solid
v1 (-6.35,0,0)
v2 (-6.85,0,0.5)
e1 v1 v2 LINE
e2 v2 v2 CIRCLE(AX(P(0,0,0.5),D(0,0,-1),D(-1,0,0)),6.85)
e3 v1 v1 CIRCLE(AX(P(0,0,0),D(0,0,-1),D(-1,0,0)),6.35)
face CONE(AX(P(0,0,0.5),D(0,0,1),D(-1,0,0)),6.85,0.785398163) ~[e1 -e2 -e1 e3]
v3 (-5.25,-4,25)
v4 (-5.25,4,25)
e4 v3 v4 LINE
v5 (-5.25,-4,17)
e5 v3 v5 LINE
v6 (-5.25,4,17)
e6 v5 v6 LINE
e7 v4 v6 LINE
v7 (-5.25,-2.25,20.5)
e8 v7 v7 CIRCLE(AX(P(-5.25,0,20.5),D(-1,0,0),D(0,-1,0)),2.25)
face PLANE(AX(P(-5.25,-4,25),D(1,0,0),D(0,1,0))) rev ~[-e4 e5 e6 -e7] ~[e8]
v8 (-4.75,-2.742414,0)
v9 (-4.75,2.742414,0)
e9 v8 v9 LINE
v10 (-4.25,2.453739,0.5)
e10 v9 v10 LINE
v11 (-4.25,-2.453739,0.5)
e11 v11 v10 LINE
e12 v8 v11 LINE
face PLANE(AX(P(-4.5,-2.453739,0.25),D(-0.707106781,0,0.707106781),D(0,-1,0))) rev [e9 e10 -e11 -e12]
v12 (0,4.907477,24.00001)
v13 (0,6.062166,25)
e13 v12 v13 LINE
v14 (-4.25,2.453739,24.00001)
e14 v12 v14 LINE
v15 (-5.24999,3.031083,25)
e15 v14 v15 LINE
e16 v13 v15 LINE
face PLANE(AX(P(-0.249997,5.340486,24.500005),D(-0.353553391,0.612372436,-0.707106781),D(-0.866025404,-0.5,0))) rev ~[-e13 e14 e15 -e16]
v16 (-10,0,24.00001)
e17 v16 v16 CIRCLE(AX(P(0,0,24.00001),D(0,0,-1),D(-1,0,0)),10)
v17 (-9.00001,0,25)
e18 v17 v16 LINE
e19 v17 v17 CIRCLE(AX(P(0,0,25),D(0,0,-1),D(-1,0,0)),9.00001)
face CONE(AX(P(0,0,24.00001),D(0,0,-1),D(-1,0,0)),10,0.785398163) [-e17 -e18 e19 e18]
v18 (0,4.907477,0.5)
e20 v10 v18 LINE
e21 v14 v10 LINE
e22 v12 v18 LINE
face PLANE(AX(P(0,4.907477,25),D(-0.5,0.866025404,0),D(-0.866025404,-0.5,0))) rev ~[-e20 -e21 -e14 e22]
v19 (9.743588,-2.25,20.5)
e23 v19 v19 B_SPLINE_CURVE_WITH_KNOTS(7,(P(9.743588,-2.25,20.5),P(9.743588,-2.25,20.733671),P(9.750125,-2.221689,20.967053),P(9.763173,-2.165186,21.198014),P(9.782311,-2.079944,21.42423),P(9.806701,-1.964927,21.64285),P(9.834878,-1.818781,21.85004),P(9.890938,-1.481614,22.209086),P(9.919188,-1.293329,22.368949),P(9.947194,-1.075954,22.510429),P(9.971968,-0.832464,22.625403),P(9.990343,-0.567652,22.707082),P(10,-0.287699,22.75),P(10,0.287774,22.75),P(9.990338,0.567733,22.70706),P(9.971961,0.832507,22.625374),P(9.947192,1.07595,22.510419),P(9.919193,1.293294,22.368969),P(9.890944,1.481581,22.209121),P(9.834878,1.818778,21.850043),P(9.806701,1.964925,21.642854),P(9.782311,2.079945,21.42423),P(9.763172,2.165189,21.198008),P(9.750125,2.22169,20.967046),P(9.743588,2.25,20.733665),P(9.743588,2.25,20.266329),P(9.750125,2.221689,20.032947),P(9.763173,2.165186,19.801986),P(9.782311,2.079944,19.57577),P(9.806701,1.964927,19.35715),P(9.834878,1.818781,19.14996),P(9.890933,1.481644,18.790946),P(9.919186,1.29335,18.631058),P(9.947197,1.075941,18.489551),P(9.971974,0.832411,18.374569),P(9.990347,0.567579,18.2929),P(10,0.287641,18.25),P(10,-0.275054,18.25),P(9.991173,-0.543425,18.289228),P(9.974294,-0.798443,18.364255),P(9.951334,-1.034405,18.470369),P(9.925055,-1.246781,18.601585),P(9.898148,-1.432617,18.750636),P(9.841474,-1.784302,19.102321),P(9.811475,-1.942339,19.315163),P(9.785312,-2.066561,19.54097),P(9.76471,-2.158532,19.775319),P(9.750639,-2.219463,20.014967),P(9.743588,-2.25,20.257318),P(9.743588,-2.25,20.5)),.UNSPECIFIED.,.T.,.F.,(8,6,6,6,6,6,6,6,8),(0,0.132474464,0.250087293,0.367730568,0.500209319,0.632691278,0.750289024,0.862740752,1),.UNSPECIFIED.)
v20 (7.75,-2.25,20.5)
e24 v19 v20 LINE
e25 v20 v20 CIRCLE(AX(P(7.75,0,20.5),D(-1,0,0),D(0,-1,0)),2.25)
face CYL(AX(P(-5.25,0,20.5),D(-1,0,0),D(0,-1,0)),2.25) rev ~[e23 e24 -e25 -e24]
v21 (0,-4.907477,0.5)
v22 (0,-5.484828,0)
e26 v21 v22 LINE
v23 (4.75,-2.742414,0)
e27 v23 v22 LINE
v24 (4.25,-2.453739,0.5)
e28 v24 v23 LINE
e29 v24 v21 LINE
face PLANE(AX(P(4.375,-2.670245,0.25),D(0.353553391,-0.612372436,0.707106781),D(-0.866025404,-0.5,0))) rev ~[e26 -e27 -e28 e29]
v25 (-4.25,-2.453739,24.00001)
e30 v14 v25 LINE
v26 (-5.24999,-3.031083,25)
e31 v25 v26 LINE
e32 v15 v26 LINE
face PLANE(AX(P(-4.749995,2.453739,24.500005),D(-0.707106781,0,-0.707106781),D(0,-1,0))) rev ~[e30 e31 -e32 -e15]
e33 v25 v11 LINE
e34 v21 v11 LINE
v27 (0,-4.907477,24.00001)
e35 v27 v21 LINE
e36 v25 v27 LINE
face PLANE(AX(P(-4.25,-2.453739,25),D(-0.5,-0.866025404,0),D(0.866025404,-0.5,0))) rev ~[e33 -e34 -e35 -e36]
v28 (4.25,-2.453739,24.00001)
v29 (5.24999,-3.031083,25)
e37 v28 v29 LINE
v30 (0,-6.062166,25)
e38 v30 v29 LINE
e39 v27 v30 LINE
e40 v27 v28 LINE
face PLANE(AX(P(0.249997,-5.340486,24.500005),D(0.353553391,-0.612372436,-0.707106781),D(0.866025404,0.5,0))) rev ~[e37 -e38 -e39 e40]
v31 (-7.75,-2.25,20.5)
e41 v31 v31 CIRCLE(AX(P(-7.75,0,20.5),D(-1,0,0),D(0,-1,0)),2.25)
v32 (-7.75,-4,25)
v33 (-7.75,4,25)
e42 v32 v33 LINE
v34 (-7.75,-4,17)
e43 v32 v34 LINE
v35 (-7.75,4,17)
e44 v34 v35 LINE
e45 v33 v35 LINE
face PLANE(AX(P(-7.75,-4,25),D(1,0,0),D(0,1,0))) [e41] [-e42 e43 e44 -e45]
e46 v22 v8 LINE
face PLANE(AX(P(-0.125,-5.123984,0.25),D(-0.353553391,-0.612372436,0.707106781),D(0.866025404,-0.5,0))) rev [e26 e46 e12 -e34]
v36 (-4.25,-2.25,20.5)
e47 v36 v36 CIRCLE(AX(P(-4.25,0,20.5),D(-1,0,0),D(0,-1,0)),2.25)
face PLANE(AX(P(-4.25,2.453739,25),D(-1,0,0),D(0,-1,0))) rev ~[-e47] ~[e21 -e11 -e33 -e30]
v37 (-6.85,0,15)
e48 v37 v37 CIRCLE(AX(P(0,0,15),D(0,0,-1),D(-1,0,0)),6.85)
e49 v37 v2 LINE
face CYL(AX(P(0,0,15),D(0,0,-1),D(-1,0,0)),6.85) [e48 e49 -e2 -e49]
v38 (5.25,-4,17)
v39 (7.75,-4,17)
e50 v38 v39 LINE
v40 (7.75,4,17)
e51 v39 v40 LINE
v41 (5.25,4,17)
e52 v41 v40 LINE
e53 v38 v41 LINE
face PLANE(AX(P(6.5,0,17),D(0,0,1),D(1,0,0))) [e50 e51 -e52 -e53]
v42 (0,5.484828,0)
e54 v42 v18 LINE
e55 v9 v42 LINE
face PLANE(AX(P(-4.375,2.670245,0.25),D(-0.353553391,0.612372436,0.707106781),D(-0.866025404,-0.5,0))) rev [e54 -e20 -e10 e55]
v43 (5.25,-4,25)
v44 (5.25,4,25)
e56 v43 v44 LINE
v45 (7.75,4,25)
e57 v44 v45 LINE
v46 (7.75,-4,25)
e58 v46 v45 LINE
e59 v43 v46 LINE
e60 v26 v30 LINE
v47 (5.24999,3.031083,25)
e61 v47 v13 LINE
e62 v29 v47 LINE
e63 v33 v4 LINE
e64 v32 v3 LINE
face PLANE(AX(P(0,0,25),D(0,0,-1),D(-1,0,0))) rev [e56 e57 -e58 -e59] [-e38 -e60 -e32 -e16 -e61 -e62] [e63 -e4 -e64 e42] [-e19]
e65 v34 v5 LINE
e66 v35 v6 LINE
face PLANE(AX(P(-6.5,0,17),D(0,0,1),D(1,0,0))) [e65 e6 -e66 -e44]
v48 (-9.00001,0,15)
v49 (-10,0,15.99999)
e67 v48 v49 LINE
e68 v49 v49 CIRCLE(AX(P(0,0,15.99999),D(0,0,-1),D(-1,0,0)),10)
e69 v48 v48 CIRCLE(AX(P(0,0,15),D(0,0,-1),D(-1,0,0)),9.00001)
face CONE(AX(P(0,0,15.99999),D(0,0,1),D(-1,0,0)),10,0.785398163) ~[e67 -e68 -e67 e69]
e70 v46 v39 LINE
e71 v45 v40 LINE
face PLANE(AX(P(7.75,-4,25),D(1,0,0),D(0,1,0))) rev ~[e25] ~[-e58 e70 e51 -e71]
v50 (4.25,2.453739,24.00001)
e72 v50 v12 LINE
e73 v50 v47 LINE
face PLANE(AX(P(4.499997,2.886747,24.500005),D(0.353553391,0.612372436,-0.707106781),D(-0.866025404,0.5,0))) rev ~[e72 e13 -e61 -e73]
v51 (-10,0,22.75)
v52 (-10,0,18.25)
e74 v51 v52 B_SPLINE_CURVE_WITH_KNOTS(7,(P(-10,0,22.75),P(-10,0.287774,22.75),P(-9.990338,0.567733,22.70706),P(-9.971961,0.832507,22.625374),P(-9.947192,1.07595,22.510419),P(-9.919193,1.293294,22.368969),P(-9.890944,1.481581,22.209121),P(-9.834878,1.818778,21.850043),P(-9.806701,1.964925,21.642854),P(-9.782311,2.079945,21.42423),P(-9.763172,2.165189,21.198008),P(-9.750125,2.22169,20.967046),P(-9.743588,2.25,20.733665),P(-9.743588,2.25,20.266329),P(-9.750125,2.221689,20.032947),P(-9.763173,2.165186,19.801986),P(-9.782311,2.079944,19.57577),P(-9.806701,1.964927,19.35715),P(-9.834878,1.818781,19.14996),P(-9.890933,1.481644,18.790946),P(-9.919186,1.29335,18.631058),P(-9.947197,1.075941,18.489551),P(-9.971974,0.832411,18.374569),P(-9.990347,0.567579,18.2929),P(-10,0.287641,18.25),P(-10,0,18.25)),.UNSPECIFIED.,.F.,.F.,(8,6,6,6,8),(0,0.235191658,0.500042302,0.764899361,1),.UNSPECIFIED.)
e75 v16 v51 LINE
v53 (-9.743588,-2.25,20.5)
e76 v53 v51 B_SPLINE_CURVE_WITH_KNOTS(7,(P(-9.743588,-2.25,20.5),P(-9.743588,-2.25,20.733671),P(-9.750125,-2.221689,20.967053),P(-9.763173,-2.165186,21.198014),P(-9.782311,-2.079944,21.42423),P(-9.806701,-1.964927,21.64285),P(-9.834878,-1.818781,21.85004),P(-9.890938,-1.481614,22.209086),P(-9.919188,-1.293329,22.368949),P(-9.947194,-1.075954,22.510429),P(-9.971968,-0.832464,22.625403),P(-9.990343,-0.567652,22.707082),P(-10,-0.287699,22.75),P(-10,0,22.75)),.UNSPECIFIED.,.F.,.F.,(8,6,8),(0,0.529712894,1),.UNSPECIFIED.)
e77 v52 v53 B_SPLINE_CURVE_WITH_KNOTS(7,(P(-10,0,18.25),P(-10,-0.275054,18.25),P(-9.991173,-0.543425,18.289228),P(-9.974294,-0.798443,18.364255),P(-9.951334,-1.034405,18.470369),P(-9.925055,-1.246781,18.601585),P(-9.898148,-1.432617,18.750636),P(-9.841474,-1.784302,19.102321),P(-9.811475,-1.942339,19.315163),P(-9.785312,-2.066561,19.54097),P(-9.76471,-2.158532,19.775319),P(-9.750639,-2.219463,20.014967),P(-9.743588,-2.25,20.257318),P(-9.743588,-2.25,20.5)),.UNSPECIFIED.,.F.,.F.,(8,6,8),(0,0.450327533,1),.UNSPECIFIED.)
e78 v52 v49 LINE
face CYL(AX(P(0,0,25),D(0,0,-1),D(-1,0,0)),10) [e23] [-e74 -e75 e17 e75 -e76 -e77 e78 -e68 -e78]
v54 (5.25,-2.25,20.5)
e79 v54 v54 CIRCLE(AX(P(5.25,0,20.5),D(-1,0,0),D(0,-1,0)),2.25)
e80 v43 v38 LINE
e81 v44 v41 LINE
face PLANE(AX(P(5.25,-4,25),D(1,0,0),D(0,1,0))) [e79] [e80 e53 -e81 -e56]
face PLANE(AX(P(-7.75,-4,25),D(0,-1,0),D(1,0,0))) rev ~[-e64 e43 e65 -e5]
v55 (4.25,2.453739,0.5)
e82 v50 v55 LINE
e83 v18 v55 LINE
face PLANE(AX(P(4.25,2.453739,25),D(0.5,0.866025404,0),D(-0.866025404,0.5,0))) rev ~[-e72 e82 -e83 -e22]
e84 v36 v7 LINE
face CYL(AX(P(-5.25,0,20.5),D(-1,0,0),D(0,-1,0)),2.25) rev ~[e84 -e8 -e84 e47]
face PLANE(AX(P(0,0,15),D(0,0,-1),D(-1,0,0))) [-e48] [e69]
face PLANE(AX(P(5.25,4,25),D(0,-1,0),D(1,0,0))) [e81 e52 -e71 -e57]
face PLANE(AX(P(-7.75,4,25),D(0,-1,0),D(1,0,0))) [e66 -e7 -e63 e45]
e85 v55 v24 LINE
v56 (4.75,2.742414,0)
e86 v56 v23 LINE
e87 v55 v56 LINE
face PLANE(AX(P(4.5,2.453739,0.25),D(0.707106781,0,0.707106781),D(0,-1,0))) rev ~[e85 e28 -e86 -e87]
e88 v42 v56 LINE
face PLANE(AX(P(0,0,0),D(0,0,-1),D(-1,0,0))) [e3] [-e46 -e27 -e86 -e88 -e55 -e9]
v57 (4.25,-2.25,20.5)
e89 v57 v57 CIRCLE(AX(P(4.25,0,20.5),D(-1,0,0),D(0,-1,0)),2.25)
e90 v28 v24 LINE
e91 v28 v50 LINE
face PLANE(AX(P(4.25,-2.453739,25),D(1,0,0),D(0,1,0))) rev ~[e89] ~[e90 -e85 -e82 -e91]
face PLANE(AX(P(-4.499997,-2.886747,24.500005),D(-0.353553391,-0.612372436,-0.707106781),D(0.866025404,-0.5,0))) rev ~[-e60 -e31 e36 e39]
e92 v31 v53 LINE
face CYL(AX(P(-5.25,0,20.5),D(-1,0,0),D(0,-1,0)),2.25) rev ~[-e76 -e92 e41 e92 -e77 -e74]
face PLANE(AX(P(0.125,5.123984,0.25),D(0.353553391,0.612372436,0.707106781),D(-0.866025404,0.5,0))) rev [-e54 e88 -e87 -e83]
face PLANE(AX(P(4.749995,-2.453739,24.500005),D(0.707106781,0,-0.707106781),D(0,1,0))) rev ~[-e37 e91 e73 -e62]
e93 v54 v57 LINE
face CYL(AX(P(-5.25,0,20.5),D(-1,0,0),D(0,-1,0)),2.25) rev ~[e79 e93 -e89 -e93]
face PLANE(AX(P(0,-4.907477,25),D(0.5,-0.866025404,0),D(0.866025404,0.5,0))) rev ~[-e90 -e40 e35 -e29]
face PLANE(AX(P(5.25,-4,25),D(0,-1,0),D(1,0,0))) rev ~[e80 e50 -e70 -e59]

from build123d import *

# Parameters (mm, degrees)
F3_DEPTH = 25.001
F2_W     = 2.5
F2_H     = 8
F4_DEPTH = 8
F5_R     = 2.25
F6_DEPTH = 25
F7_SIZE  = 0.99999
F8_SIZE  = 0.5


# Not quite as in the source:
# - a fillet or chamfer is up to 0.001 mm smaller than in the source, because OpenCascade refuses the exact size


with BuildPart() as f1:
    # F0 (on Front) → F1 (revolve)
    with BuildSketch(Plane.XZ):
        Polygon((-6.85, 0), (0, 0), (0, 25), (-10, 25), (-10, 15), (-6.85, 15), align=None)
    revolve(axis=Axis((0, 0, 12.5), (0, 0, -1)))

    # F2 (on face) → F3 (cut, through all)
    with BuildSketch(Plane.XY.offset(25)):
        Polygon((4.25, -2.4537386441), (4.25, 2.4537386441), (0, 4.9074772881), (-4.25, 2.4537386441), (-4.25, -2.4537386441), (0, -4.9074772881), align=None)
    extrude(amount=-F3_DEPTH, mode=Mode.SUBTRACT)

    # F2 (on face) → F4 (cut)
    with BuildSketch(Plane.XY.offset(25)):
        with Locations((-6.5, 0)):
            Rectangle(F2_W, F2_H)
        with Locations((6.5, 0)):
            Rectangle(F2_W, F2_H)
    extrude(amount=-F4_DEPTH, mode=Mode.SUBTRACT)

    # F5 (on face) → F6 (cut, symmetric)
    with BuildSketch(Plane(origin=(-5.25, 0, 0), x_dir=(0, -1, 0), z_dir=(-1, 0, 0))):
        with Locations((0, 20.5)):
            Circle(F5_R)
    extrude(amount=F6_DEPTH, both=True, mode=Mode.SUBTRACT)

    # F7 (size 1 in the source; OpenCascade refuses exactly that, so slightly less here)
    f7_edges = [f1.edges().sort_by_distance(p)[0] for p in [
        (10, 0, 25),
        (10, 0, 15),
        (-2.125, 3.680608, 25),
        (2.125, 3.680608, 25),
        (4.25, 0, 25),
        (2.125, -3.680608, 25),
        (-2.125, -3.680608, 25),
        (-4.25, 0, 25),
    ]]
    chamfer(f7_edges, length=F7_SIZE)

    # F8
    f8_edges = [f1.edges().sort_by_distance(p)[0] for p in [
        (6.85, 0, 0),
        (4.25, 0, 0),
        (2.125, -3.680608, 0),
        (-2.125, -3.680608, 0),
        (-4.25, 0, 0),
        (-2.125, 3.680608, 0),
        (2.125, 3.680608, 0),
    ]]
    chamfer(f8_edges, length=F8_SIZE)


solid = f1.part
